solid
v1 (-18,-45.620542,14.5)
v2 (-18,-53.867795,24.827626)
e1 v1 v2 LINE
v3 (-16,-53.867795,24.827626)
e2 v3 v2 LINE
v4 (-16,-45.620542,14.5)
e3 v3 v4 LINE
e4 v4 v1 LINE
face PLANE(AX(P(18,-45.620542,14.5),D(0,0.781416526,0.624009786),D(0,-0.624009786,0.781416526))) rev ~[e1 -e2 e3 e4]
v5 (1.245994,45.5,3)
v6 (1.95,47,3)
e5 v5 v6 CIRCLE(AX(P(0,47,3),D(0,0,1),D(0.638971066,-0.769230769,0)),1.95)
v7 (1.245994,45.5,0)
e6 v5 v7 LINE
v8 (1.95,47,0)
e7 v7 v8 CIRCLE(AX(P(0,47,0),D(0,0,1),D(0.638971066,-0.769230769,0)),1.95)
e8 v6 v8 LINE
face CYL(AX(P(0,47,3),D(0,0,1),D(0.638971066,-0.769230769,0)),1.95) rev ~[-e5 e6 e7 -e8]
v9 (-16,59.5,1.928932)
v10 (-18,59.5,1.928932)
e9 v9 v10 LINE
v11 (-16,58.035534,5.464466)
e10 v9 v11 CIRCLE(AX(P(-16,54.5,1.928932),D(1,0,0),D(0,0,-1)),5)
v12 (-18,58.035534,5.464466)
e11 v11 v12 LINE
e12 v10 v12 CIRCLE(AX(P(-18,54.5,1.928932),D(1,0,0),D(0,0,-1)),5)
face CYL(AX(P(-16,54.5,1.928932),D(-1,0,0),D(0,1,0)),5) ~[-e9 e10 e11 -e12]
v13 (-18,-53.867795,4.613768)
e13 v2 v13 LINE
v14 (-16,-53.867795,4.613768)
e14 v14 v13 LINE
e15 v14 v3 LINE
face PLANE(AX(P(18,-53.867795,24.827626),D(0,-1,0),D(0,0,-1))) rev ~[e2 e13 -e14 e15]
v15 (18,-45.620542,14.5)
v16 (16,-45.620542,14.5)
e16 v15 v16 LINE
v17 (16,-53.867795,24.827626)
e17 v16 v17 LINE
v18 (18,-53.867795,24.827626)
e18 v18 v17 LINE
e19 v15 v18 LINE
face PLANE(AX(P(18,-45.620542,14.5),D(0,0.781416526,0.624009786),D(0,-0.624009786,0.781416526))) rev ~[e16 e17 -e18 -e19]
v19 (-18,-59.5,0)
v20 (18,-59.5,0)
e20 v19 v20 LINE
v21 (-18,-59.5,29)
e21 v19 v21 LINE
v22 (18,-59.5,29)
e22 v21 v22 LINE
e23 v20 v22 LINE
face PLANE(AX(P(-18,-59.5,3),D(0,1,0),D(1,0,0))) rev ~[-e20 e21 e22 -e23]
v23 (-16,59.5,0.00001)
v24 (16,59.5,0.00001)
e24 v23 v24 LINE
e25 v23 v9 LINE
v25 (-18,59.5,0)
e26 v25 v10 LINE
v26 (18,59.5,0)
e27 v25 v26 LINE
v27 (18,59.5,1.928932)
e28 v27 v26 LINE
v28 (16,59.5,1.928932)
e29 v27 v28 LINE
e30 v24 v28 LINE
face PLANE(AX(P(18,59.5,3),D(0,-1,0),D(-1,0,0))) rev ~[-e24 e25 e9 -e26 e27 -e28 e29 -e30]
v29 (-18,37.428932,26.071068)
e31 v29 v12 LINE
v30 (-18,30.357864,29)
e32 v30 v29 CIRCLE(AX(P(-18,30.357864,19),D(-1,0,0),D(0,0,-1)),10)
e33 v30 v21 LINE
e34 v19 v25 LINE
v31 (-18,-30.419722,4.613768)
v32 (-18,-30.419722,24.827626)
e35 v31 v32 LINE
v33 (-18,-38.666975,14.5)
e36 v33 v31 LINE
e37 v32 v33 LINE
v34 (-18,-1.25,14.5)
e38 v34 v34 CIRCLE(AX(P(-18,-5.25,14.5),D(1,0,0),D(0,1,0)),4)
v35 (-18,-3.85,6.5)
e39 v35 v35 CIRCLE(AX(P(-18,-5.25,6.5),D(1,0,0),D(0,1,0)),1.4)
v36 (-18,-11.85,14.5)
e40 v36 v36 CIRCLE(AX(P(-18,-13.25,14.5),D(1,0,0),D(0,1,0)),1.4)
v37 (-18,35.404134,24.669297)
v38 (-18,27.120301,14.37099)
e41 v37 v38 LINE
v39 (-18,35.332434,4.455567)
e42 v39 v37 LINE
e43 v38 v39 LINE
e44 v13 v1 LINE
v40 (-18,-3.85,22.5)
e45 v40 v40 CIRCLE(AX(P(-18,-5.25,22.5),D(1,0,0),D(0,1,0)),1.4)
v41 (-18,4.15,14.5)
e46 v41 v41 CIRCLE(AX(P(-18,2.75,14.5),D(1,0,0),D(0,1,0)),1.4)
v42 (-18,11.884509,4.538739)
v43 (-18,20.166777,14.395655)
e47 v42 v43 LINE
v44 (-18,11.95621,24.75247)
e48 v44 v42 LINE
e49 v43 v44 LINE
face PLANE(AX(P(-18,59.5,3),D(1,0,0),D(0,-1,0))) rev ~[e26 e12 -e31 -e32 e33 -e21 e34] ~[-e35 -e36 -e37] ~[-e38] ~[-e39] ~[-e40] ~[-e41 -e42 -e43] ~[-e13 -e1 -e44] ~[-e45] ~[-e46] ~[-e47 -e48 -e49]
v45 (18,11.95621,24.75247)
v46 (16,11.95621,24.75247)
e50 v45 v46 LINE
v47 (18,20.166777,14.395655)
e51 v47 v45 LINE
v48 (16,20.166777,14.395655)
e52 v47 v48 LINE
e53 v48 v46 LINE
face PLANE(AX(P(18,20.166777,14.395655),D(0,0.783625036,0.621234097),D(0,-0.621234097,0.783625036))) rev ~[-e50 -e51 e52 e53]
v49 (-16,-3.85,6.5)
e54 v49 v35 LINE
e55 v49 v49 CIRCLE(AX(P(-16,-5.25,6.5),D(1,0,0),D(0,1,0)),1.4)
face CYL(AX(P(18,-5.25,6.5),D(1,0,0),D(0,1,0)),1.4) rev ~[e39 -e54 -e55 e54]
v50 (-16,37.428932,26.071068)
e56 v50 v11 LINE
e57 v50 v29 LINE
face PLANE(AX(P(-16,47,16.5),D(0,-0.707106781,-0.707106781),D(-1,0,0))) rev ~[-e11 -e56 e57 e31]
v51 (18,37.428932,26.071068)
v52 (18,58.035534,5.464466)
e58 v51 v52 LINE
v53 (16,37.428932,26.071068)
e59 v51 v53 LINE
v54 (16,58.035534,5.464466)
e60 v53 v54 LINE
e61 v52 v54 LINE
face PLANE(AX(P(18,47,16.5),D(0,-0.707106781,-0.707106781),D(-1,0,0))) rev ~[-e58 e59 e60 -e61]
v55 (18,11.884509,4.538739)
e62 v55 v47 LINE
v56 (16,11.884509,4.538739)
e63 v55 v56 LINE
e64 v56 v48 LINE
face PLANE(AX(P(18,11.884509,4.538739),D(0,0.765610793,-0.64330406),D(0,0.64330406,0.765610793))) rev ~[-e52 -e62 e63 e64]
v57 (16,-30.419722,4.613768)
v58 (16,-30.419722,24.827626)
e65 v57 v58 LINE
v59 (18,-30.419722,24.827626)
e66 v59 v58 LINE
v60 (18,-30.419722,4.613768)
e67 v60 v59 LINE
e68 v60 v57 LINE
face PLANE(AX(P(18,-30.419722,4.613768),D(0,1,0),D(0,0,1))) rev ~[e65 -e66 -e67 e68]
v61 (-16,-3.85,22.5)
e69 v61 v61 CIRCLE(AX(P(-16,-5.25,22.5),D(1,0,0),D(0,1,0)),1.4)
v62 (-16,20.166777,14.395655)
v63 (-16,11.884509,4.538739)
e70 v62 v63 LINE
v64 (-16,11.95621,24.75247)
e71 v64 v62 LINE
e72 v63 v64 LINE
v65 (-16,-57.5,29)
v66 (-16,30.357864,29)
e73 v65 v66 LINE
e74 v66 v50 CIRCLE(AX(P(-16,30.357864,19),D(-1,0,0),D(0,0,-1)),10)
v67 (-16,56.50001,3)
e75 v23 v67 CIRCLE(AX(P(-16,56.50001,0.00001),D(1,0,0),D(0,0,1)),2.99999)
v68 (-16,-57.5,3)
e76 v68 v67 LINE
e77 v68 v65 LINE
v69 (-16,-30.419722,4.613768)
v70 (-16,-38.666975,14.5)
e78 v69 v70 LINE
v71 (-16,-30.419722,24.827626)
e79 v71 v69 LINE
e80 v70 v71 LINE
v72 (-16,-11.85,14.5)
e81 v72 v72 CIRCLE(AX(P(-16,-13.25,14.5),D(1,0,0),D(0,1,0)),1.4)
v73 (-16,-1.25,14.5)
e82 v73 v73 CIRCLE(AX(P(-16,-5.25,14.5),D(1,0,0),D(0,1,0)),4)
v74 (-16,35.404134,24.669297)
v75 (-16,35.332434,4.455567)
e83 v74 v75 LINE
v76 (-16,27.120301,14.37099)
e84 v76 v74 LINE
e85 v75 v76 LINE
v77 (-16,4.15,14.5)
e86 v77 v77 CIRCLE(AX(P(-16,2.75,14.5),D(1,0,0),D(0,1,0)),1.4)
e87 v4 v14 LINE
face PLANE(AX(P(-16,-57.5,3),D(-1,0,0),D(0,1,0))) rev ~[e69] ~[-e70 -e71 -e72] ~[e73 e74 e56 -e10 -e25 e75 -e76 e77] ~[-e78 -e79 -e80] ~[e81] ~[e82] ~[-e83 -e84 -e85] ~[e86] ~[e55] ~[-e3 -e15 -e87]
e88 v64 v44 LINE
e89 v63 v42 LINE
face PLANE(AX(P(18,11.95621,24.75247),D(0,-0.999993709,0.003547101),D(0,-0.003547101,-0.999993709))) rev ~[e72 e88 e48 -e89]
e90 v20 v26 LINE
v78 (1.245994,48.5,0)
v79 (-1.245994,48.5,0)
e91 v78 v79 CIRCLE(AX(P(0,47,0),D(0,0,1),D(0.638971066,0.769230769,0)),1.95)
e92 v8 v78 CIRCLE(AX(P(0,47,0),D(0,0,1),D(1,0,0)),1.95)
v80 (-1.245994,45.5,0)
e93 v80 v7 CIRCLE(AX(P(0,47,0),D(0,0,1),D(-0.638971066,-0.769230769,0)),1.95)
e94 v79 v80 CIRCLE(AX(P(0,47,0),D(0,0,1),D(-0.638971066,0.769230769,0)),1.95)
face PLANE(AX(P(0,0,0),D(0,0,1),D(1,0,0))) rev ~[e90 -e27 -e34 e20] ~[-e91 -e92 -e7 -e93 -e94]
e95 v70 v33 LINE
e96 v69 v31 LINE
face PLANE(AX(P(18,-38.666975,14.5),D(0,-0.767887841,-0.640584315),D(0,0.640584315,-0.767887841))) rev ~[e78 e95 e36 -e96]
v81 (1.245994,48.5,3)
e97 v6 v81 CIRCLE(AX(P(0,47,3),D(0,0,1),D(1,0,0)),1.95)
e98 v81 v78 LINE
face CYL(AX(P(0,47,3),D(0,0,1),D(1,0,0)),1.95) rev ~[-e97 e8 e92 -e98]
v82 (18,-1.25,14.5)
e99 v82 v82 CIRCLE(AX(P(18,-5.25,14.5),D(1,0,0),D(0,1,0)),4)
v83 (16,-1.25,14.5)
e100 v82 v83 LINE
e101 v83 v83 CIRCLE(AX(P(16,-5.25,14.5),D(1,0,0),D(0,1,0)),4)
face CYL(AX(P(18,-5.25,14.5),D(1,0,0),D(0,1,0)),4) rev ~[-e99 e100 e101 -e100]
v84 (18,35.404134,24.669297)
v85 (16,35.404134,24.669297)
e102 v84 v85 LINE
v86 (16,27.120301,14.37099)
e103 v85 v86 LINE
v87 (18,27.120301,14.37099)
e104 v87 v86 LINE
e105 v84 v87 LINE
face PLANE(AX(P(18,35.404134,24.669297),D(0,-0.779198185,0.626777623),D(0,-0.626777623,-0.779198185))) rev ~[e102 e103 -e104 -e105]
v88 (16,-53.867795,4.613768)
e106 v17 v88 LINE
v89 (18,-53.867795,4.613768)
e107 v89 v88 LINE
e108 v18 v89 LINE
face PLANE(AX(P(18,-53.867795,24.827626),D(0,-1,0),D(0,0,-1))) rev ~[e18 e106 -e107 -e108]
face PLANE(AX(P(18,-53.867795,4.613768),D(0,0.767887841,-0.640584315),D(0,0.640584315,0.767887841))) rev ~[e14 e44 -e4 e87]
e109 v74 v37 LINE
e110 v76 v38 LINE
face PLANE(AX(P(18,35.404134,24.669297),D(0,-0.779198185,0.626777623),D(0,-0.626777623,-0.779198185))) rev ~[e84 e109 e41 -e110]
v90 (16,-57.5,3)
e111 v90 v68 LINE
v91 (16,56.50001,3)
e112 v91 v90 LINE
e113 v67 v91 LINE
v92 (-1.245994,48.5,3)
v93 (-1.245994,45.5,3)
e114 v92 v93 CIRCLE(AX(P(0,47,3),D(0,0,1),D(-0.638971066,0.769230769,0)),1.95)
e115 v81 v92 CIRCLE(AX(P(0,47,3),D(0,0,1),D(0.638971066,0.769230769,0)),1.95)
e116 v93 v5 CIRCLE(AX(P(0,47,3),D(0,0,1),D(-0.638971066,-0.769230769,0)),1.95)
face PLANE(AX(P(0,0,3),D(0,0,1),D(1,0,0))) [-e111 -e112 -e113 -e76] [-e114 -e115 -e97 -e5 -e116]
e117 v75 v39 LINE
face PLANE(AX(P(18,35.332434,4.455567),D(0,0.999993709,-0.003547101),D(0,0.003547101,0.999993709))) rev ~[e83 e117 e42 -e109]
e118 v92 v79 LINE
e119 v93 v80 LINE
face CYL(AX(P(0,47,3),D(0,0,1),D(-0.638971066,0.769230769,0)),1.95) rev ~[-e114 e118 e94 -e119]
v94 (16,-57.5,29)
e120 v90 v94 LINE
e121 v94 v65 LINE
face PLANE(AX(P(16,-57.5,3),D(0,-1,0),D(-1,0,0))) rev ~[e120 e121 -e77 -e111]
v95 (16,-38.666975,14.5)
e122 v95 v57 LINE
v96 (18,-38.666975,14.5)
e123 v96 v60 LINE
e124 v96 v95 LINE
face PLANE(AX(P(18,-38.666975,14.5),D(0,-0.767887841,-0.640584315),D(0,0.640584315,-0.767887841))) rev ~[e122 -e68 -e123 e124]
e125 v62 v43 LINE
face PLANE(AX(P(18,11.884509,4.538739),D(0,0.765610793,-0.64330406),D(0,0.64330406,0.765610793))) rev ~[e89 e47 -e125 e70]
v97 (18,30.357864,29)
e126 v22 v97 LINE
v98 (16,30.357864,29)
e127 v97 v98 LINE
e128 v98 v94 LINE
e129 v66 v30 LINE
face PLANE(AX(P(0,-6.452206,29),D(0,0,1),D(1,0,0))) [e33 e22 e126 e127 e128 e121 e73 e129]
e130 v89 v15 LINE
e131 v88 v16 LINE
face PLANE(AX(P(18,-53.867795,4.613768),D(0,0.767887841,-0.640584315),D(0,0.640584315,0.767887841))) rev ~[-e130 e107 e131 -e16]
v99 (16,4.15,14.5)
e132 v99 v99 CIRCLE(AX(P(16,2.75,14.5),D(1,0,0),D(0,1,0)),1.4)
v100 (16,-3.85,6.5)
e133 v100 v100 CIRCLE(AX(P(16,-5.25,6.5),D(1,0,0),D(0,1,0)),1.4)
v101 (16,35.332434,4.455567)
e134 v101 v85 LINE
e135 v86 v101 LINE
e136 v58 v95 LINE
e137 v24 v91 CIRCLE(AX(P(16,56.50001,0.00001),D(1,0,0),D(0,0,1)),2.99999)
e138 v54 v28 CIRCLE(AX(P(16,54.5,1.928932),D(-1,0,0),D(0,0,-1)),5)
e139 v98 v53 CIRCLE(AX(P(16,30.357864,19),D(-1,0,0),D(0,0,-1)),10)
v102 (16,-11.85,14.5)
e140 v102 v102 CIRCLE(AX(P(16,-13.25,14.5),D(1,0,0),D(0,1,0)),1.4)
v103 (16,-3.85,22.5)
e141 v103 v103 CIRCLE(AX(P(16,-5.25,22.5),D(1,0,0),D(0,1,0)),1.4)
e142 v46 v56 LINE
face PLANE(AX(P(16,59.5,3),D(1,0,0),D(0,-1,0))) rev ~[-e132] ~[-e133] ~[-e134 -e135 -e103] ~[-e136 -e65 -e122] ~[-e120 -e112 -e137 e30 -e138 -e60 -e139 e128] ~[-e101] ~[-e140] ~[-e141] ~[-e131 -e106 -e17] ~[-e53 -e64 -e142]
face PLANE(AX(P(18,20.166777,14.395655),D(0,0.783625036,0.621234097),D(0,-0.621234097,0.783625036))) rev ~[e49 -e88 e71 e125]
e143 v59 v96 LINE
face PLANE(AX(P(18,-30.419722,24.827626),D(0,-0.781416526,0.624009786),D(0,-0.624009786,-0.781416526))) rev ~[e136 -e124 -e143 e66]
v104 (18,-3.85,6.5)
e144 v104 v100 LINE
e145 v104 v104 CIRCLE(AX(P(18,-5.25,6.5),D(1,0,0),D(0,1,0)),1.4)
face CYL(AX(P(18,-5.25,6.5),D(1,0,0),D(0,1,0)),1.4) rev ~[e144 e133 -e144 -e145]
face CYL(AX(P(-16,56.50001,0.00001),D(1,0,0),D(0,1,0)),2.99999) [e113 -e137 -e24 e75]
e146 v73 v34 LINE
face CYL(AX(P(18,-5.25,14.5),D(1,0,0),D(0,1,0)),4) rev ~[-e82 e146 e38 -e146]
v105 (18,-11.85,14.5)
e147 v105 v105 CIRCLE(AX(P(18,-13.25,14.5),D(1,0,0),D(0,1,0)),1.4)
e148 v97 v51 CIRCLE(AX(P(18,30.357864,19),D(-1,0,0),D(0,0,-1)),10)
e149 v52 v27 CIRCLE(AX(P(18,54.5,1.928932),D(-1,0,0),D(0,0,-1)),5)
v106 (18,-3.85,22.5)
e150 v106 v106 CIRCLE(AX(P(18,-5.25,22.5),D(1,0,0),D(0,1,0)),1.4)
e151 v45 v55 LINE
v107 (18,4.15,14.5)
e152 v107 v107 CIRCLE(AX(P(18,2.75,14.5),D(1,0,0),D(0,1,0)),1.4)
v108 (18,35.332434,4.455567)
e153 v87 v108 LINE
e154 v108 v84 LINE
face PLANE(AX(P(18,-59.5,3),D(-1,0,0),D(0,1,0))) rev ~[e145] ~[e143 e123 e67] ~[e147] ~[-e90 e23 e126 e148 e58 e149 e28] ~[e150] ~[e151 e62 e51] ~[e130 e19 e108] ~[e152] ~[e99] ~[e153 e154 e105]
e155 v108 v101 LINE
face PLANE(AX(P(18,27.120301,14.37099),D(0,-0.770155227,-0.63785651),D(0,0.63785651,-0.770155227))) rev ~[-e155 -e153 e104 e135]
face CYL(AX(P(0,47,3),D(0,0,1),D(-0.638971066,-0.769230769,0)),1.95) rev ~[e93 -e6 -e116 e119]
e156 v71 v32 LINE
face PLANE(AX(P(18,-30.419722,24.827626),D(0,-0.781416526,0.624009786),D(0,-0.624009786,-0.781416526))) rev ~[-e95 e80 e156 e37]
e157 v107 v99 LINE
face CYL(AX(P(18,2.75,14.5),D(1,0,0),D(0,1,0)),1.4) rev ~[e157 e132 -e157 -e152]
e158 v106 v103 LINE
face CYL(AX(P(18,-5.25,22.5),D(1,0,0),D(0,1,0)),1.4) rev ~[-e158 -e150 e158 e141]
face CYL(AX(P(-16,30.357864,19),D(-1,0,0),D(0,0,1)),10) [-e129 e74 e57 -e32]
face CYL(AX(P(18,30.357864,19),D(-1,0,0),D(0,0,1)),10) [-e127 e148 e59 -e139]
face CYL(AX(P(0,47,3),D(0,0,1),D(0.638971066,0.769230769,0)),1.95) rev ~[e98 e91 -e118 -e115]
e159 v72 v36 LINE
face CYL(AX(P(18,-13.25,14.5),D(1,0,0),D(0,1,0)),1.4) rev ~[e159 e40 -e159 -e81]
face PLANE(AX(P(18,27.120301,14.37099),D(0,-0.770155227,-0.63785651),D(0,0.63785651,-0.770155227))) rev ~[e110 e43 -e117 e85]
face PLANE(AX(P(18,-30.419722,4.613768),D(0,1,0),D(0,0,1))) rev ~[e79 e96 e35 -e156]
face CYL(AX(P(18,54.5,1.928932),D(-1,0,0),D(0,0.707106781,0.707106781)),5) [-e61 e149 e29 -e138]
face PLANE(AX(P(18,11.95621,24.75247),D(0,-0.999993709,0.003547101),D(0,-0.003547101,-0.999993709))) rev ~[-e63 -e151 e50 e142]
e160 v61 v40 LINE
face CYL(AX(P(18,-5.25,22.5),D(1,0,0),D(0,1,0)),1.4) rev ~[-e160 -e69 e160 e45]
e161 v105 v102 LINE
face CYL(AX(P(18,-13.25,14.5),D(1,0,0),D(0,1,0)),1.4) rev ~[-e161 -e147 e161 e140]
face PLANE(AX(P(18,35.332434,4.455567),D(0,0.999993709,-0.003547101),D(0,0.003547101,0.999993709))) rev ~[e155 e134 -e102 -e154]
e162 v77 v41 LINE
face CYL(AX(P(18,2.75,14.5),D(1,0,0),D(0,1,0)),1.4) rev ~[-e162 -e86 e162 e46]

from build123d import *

# Parameters (mm, degrees)
F0_W      = 36
F0_H      = 119
F1_DEPTH  = 3
F3_DEPTH  = 26
F5_SIZE   = 25
F6_R      = 10
F7_R      = 2.99999
F8_R      = 5
F10_DEPTH = 25
F9_R      = 1.4
F9_R_2    = 4
F11_DEPTH = 36.001


# Not quite as in the source:
# - a fillet or chamfer is up to 0.001 mm smaller than in the source, because OpenCascade refuses the exact size


with BuildPart() as f1:
    # F0 (on Top) → F1 (new body)
    with BuildSketch(Plane.XY):
        Rectangle(F0_W, F0_H)
    extrude(amount=F1_DEPTH)

    # F2 (on face) → F3 (join)
    with BuildSketch(Plane.XY.offset(3)):
        Polygon((16, -57.5), (-16, -57.5), (-16, 57.5), (-16, 59.5), (-18, 59.5), (-18, -59.5), (18, -59.5), (18, 59.5), (16, 59.5), (16, 57.5), align=None)
    extrude(amount=F3_DEPTH)

    # F5
    f5_edges = [f1.edges().sort_by_distance(p)[0] for p in [
        (-17, 59.5, 29),
        (17, 59.5, 29),
    ]]
    chamfer(f5_edges, length=F5_SIZE)

    # F6
    f6_edges = [f1.edges().sort_by_distance(p)[0] for p in [
        (17, 34.5, 29),
        (-17, 34.5, 29),
    ]]
    fillet(f6_edges, radius=F6_R)

    # F7 (radius 3 in the source; OpenCascade refuses exactly that, so slightly less here)
    f7_edges = [f1.edges().sort_by_distance(p)[0] for p in [
        (0, 59.5, 3),
    ]]
    fillet(f7_edges, radius=F7_R)

    # F8
    f8_edges = [f1.edges().sort_by_distance(p)[0] for p in [
        (17, 59.5, 4),
        (-17, 59.5, 4),
    ]]
    fillet(f8_edges, radius=F8_R)

    # F4 (on face) → F10 (cut)
    with BuildSketch(Plane.XY.offset(3)):
        with BuildLine():
            ThreePointArc((-1.2459935794, 48.5), (-1.95, 47), (-1.2459935794, 45.5))
            ThreePointArc((-1.2459935794, 45.5), (0, 45.05), (1.2459935794, 45.5))
            ThreePointArc((1.2459935794, 45.5), (1.7652460848, 46.1715036149), (1.95, 47))
            ThreePointArc((1.95, 47), (1.7652460848, 47.8284963851), (1.2459935794, 48.5))
            ThreePointArc((1.2459935794, 48.5), (0, 48.95), (-1.2459935794, 48.5))
        make_face()
    extrude(amount=-F10_DEPTH, mode=Mode.SUBTRACT)

    # F9 (on face) → F11 (cut, through all)
    with BuildSketch(Plane.YZ.offset(18)):
        with Locations((-5.25, 22.5)):
            Circle(F9_R)
        with Locations((2.75, 14.5)):
            Circle(F9_R)
        with Locations((-5.25, 14.5)):
            Circle(F9_R_2)
        with Locations((-5.25, 6.5)):
            Circle(F9_R)
        with Locations((-13.25, 14.5)):
            Circle(F9_R)
        Polygon((-45.6205420196, 14.5), (-53.8677945733, 24.8276256025), (-53.8677945733, 4.6137683094), align=None)
        Polygon((-30.4197221994, 24.8276256025), (-38.6669747531, 14.5), (-30.4197221994, 4.6137683094), align=None)
        Polygon((11.8845089816, 4.5387393932), (20.1667771096, 14.395655056), (11.9562095653, 24.7524695214), align=None)
        Polygon((35.4041344278, 24.6692968517), (27.1203006313, 14.3709900539), (35.3324338441, 4.4555667236), align=None)
    extrude(amount=-F11_DEPTH, mode=Mode.SUBTRACT)


solid = f1.part
